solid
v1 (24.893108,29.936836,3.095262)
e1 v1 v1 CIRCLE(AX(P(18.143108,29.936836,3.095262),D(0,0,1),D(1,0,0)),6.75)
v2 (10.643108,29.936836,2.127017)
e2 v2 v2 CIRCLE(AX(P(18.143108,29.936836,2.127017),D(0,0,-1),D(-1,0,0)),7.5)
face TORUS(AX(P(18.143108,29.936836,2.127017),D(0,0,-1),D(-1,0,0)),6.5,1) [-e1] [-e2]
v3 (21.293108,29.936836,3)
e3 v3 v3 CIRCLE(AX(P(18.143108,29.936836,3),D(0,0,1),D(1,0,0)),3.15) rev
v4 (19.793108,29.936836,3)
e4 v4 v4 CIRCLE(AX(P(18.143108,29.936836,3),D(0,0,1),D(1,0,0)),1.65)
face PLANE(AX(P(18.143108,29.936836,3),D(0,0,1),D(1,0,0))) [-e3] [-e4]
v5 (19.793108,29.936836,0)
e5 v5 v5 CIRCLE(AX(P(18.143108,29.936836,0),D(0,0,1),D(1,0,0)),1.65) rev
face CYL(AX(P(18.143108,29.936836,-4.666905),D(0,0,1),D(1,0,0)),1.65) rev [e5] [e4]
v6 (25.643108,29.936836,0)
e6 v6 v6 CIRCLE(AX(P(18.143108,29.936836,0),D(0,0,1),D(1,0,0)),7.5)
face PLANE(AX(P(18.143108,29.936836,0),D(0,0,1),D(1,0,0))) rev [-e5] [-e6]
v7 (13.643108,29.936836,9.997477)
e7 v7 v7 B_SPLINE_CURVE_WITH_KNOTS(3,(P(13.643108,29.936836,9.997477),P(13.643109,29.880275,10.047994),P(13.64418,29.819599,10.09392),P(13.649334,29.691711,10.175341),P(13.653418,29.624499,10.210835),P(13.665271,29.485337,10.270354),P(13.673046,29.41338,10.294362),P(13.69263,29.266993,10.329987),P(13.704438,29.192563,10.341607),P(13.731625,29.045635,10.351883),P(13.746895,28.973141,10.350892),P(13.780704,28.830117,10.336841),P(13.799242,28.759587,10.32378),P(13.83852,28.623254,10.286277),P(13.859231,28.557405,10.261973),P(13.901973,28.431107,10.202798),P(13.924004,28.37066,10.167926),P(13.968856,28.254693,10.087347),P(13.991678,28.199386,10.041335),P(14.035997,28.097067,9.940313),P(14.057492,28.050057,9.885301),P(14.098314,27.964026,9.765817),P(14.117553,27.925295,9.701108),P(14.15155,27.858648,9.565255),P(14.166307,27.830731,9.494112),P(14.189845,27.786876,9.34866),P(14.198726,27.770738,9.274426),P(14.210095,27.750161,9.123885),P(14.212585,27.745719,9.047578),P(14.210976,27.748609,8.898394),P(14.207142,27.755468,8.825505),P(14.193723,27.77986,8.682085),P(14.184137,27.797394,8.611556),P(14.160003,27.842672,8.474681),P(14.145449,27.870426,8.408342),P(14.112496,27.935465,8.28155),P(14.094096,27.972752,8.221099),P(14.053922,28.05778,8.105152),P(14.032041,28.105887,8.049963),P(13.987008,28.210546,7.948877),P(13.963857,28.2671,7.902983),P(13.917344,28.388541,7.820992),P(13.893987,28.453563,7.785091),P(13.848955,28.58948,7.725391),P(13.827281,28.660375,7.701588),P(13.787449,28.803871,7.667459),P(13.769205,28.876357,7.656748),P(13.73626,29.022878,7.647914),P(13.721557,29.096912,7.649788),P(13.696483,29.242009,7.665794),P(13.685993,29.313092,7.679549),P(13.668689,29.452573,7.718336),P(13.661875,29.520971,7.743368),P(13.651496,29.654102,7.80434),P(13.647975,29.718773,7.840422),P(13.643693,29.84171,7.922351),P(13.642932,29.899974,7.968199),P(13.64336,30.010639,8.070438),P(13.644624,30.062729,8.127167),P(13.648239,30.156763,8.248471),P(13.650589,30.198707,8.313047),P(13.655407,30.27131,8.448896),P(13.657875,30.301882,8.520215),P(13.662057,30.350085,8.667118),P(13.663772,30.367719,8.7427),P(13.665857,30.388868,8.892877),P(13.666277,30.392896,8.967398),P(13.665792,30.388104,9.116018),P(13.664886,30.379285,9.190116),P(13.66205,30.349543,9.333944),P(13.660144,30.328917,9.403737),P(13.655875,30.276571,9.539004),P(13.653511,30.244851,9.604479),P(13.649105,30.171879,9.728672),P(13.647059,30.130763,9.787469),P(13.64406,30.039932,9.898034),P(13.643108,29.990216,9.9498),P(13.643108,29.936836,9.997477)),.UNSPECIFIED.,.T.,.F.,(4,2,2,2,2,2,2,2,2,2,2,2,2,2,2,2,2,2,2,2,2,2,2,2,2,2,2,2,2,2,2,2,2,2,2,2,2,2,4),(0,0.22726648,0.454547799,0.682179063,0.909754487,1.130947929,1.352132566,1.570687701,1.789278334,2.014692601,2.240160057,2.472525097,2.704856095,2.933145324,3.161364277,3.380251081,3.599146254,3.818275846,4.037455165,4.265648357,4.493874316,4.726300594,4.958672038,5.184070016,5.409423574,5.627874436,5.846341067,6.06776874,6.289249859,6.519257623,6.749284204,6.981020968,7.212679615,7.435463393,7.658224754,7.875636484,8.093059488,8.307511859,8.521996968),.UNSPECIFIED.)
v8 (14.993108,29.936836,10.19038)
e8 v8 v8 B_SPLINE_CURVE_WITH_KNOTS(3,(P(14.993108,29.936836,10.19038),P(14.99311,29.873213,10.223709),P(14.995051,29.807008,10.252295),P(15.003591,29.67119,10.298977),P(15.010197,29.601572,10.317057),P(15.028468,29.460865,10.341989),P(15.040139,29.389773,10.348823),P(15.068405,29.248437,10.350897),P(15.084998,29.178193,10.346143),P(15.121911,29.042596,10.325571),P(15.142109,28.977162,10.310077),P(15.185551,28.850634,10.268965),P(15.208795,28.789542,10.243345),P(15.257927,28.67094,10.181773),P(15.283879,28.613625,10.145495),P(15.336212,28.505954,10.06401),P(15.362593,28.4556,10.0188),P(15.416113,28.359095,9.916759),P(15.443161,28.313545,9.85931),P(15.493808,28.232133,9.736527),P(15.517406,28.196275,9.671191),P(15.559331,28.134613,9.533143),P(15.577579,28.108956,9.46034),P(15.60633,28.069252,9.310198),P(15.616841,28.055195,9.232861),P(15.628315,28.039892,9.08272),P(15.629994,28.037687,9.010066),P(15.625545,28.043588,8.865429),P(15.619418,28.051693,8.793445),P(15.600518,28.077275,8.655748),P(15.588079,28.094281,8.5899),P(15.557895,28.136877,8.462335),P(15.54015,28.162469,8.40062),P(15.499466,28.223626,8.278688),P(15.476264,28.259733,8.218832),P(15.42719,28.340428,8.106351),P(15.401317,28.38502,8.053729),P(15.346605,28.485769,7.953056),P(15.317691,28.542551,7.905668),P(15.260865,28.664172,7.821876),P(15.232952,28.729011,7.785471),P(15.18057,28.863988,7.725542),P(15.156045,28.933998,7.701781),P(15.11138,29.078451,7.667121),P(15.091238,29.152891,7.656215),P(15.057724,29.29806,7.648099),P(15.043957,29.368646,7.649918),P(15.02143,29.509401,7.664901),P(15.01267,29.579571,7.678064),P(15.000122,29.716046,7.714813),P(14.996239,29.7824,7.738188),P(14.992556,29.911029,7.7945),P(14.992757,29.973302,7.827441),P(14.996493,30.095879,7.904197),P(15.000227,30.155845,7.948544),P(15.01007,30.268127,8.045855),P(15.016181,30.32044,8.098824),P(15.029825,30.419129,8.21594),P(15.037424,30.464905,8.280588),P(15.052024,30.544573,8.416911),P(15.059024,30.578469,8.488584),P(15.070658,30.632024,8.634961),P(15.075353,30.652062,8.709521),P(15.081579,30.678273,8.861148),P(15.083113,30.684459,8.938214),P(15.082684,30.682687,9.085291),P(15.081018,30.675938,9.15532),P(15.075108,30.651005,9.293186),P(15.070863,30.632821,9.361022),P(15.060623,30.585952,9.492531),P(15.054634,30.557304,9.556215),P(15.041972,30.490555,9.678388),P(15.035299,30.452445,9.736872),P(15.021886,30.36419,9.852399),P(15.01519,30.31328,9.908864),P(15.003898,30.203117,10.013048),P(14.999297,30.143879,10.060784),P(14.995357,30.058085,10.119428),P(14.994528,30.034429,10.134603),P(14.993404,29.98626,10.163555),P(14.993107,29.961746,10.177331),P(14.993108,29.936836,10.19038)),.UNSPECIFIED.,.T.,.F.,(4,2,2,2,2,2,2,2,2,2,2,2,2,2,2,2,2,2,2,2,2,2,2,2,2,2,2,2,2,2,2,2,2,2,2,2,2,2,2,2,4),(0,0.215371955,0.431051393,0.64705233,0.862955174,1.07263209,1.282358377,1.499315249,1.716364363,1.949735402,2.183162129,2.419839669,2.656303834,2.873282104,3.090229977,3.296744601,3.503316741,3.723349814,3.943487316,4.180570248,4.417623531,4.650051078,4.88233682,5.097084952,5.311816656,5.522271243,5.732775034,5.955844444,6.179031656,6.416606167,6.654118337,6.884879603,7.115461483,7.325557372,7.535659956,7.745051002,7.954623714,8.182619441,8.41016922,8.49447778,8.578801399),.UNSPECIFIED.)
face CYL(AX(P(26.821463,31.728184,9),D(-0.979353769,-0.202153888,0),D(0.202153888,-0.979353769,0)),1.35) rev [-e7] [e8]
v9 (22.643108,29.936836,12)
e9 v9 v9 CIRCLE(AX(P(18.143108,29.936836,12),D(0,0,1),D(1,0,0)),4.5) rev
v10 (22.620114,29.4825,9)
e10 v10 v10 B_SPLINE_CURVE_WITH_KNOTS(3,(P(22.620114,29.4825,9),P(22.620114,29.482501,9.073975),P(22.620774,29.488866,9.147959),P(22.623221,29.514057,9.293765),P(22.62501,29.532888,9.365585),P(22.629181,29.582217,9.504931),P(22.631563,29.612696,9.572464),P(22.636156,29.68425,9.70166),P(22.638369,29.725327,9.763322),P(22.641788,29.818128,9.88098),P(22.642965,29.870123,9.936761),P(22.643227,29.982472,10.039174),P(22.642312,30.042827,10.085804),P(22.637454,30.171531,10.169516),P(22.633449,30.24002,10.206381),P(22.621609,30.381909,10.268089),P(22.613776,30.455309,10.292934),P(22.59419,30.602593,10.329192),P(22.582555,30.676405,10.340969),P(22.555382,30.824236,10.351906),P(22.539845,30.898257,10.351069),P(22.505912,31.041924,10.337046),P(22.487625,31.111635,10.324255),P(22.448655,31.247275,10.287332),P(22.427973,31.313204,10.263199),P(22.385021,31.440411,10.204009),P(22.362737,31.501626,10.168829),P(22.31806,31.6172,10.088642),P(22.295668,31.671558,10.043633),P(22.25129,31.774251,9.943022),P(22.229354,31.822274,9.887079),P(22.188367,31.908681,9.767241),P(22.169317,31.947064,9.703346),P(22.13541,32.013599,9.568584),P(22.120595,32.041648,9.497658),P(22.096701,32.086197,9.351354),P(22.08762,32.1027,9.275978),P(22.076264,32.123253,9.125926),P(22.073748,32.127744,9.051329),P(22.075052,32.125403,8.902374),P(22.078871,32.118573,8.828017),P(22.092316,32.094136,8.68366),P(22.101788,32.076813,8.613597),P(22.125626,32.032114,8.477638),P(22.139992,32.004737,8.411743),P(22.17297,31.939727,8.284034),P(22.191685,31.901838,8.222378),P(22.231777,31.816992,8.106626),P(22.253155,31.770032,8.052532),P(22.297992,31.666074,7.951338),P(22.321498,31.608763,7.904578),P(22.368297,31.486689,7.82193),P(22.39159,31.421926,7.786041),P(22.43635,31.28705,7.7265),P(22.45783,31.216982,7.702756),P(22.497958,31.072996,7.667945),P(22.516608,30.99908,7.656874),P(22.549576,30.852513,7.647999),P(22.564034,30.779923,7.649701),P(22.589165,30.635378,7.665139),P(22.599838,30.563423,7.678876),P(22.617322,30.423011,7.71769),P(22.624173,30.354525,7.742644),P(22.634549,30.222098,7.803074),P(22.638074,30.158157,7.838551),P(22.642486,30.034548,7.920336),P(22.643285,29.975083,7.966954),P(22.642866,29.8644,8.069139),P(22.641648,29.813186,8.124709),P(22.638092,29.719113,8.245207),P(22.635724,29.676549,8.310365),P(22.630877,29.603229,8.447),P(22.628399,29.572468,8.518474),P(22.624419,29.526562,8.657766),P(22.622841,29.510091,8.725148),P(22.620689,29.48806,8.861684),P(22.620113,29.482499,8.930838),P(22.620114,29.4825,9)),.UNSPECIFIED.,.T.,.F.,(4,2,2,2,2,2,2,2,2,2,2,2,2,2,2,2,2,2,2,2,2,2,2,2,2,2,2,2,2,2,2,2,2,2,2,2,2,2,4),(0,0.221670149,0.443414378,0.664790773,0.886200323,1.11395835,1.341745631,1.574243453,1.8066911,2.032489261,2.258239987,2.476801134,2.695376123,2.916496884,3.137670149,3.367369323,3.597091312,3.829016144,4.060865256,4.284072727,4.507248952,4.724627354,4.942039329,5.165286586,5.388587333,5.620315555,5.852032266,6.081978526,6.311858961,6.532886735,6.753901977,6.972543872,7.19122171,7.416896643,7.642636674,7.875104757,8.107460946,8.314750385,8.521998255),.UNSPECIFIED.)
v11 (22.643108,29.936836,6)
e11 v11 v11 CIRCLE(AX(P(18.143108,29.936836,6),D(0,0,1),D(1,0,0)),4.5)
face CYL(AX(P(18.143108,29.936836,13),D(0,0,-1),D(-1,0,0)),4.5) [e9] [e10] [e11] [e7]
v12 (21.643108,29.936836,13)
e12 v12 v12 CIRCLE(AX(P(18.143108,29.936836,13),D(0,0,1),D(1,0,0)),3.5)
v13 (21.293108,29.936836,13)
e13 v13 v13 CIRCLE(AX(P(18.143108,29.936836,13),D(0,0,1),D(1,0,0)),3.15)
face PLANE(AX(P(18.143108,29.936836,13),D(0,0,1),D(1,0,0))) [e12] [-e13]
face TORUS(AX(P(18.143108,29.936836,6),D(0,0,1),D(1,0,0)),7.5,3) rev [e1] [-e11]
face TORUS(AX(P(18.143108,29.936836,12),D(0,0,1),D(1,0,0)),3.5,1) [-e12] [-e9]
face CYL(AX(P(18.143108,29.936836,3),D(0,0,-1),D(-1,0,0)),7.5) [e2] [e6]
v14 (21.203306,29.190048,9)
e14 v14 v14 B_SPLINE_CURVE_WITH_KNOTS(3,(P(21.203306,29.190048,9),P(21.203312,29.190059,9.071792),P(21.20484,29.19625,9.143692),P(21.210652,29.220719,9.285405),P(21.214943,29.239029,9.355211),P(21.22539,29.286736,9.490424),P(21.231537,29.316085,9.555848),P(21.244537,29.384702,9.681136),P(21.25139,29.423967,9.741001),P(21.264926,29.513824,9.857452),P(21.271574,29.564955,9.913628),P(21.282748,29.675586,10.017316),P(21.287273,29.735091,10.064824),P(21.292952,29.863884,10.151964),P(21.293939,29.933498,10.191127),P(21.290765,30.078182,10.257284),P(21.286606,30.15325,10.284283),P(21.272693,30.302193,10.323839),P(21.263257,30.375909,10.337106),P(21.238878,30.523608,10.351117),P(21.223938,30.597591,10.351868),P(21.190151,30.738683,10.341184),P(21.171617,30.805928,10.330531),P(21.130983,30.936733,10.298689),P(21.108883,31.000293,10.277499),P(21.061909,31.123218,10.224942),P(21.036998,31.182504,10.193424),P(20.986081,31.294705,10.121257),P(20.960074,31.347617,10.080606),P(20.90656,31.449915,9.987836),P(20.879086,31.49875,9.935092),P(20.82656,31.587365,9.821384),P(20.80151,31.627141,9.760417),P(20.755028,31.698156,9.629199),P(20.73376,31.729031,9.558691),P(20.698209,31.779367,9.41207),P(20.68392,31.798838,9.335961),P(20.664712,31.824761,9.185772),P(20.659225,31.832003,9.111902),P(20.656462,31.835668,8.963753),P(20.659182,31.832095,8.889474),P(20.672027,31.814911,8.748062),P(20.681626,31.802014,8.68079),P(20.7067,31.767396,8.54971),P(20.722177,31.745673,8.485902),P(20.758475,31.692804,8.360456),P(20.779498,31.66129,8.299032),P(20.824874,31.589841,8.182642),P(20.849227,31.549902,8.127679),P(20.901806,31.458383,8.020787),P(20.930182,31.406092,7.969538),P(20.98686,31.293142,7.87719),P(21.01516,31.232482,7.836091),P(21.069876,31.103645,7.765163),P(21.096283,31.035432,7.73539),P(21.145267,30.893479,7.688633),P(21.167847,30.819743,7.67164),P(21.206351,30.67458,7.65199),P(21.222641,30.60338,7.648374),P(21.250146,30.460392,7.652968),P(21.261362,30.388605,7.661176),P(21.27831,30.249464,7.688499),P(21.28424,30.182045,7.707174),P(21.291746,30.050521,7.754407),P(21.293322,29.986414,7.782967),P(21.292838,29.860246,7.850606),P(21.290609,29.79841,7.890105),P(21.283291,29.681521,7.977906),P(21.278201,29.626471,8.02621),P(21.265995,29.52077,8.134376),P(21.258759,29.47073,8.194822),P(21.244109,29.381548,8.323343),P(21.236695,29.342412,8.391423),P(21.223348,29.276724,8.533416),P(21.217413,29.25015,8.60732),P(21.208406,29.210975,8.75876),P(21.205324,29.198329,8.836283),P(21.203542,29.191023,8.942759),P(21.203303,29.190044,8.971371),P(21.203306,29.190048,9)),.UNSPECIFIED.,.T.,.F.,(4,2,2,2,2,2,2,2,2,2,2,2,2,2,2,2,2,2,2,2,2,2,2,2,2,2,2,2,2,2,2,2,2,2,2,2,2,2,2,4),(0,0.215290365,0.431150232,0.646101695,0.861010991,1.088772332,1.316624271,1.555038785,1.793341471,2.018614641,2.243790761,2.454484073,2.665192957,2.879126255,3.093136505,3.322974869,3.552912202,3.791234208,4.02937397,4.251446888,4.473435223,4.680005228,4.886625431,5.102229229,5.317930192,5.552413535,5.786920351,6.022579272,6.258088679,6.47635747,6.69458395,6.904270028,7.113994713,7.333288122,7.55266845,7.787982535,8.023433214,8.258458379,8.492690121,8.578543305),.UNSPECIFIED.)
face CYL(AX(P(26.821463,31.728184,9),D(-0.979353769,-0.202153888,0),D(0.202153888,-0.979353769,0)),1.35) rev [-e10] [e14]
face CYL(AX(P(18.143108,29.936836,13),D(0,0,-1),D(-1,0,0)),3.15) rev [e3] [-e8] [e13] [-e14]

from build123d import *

# Parameters (mm, degrees)
SKETCH_6_R          = 7.5
EXTRUDE_1_DEPTH     = 3
SKETCH_7_R          = 4.5
SKETCH_7_R_2        = 3.15
EXTRUDE_2_DEPTH     = 10
FILLET_1_R          = 3
SKETCH_9_R          = 1.65
CUT_EXTRUDE_1_DEPTH = 3
FILLET_2_R          = 1
SKETCH_10_R         = 1.35
CUT_EXTRUDE_2_DEPTH = 37.90351326


with BuildPart() as part:
    # 草图6 → 凸台-拉伸1 (new body)
    with BuildSketch(Plane.XY):
        with Locations((18.143108258, 29.936835998)):
            Circle(SKETCH_6_R)
    extrude(amount=EXTRUDE_1_DEPTH)

    # 草图7 → 凸台-拉伸2 (add)
    with BuildSketch(Plane.XY.offset(3)):
        with Locations((18.143108258, 29.936835998)):
            Circle(SKETCH_7_R)
        with Locations((18.143108258, 29.936835998)):
            Circle(SKETCH_7_R_2, mode=Mode.SUBTRACT)
    extrude(amount=EXTRUDE_2_DEPTH)

    # 圆角1
    fillet_1_edges = [part.edges().sort_by_distance(p)[0] for p in [
        (13.643108258, 29.936835998, 3),
    ]]
    fillet(fillet_1_edges, radius=FILLET_1_R - 0.0001)  # a hair under: the kernel refuses the full size

    # 草图9 → 切除-拉伸1 (cut)
    with BuildSketch(Plane.XY.offset(3)):
        with Locations((18.143108258, 29.936835998)):
            Circle(SKETCH_9_R)
    extrude(amount=-CUT_EXTRUDE_1_DEPTH, mode=Mode.SUBTRACT)

    # 圆角2
    fillet_2_edges = [part.edges().sort_by_distance(p)[0] for p in [
        (10.643108258, 29.936835998, 3),
        (13.643108258, 29.936835998, 13),
    ]]
    fillet(fillet_2_edges, radius=FILLET_2_R)

    # 草图10 → 切除-拉伸2 (cut, through all)
    with BuildSketch(Plane(origin=(18.921476442, 3.905687751, 0), x_dir=(0, 0, 1), z_dir=(-0.9793537694565077, -0.20215388754938593, 0))):
        with Locations(Location((9, 25.651053313, 0), (0, 0, 270))):
            Circle(SKETCH_10_R)
    extrude(amount=-CUT_EXTRUDE_2_DEPTH, mode=Mode.SUBTRACT)


solid = part.part
